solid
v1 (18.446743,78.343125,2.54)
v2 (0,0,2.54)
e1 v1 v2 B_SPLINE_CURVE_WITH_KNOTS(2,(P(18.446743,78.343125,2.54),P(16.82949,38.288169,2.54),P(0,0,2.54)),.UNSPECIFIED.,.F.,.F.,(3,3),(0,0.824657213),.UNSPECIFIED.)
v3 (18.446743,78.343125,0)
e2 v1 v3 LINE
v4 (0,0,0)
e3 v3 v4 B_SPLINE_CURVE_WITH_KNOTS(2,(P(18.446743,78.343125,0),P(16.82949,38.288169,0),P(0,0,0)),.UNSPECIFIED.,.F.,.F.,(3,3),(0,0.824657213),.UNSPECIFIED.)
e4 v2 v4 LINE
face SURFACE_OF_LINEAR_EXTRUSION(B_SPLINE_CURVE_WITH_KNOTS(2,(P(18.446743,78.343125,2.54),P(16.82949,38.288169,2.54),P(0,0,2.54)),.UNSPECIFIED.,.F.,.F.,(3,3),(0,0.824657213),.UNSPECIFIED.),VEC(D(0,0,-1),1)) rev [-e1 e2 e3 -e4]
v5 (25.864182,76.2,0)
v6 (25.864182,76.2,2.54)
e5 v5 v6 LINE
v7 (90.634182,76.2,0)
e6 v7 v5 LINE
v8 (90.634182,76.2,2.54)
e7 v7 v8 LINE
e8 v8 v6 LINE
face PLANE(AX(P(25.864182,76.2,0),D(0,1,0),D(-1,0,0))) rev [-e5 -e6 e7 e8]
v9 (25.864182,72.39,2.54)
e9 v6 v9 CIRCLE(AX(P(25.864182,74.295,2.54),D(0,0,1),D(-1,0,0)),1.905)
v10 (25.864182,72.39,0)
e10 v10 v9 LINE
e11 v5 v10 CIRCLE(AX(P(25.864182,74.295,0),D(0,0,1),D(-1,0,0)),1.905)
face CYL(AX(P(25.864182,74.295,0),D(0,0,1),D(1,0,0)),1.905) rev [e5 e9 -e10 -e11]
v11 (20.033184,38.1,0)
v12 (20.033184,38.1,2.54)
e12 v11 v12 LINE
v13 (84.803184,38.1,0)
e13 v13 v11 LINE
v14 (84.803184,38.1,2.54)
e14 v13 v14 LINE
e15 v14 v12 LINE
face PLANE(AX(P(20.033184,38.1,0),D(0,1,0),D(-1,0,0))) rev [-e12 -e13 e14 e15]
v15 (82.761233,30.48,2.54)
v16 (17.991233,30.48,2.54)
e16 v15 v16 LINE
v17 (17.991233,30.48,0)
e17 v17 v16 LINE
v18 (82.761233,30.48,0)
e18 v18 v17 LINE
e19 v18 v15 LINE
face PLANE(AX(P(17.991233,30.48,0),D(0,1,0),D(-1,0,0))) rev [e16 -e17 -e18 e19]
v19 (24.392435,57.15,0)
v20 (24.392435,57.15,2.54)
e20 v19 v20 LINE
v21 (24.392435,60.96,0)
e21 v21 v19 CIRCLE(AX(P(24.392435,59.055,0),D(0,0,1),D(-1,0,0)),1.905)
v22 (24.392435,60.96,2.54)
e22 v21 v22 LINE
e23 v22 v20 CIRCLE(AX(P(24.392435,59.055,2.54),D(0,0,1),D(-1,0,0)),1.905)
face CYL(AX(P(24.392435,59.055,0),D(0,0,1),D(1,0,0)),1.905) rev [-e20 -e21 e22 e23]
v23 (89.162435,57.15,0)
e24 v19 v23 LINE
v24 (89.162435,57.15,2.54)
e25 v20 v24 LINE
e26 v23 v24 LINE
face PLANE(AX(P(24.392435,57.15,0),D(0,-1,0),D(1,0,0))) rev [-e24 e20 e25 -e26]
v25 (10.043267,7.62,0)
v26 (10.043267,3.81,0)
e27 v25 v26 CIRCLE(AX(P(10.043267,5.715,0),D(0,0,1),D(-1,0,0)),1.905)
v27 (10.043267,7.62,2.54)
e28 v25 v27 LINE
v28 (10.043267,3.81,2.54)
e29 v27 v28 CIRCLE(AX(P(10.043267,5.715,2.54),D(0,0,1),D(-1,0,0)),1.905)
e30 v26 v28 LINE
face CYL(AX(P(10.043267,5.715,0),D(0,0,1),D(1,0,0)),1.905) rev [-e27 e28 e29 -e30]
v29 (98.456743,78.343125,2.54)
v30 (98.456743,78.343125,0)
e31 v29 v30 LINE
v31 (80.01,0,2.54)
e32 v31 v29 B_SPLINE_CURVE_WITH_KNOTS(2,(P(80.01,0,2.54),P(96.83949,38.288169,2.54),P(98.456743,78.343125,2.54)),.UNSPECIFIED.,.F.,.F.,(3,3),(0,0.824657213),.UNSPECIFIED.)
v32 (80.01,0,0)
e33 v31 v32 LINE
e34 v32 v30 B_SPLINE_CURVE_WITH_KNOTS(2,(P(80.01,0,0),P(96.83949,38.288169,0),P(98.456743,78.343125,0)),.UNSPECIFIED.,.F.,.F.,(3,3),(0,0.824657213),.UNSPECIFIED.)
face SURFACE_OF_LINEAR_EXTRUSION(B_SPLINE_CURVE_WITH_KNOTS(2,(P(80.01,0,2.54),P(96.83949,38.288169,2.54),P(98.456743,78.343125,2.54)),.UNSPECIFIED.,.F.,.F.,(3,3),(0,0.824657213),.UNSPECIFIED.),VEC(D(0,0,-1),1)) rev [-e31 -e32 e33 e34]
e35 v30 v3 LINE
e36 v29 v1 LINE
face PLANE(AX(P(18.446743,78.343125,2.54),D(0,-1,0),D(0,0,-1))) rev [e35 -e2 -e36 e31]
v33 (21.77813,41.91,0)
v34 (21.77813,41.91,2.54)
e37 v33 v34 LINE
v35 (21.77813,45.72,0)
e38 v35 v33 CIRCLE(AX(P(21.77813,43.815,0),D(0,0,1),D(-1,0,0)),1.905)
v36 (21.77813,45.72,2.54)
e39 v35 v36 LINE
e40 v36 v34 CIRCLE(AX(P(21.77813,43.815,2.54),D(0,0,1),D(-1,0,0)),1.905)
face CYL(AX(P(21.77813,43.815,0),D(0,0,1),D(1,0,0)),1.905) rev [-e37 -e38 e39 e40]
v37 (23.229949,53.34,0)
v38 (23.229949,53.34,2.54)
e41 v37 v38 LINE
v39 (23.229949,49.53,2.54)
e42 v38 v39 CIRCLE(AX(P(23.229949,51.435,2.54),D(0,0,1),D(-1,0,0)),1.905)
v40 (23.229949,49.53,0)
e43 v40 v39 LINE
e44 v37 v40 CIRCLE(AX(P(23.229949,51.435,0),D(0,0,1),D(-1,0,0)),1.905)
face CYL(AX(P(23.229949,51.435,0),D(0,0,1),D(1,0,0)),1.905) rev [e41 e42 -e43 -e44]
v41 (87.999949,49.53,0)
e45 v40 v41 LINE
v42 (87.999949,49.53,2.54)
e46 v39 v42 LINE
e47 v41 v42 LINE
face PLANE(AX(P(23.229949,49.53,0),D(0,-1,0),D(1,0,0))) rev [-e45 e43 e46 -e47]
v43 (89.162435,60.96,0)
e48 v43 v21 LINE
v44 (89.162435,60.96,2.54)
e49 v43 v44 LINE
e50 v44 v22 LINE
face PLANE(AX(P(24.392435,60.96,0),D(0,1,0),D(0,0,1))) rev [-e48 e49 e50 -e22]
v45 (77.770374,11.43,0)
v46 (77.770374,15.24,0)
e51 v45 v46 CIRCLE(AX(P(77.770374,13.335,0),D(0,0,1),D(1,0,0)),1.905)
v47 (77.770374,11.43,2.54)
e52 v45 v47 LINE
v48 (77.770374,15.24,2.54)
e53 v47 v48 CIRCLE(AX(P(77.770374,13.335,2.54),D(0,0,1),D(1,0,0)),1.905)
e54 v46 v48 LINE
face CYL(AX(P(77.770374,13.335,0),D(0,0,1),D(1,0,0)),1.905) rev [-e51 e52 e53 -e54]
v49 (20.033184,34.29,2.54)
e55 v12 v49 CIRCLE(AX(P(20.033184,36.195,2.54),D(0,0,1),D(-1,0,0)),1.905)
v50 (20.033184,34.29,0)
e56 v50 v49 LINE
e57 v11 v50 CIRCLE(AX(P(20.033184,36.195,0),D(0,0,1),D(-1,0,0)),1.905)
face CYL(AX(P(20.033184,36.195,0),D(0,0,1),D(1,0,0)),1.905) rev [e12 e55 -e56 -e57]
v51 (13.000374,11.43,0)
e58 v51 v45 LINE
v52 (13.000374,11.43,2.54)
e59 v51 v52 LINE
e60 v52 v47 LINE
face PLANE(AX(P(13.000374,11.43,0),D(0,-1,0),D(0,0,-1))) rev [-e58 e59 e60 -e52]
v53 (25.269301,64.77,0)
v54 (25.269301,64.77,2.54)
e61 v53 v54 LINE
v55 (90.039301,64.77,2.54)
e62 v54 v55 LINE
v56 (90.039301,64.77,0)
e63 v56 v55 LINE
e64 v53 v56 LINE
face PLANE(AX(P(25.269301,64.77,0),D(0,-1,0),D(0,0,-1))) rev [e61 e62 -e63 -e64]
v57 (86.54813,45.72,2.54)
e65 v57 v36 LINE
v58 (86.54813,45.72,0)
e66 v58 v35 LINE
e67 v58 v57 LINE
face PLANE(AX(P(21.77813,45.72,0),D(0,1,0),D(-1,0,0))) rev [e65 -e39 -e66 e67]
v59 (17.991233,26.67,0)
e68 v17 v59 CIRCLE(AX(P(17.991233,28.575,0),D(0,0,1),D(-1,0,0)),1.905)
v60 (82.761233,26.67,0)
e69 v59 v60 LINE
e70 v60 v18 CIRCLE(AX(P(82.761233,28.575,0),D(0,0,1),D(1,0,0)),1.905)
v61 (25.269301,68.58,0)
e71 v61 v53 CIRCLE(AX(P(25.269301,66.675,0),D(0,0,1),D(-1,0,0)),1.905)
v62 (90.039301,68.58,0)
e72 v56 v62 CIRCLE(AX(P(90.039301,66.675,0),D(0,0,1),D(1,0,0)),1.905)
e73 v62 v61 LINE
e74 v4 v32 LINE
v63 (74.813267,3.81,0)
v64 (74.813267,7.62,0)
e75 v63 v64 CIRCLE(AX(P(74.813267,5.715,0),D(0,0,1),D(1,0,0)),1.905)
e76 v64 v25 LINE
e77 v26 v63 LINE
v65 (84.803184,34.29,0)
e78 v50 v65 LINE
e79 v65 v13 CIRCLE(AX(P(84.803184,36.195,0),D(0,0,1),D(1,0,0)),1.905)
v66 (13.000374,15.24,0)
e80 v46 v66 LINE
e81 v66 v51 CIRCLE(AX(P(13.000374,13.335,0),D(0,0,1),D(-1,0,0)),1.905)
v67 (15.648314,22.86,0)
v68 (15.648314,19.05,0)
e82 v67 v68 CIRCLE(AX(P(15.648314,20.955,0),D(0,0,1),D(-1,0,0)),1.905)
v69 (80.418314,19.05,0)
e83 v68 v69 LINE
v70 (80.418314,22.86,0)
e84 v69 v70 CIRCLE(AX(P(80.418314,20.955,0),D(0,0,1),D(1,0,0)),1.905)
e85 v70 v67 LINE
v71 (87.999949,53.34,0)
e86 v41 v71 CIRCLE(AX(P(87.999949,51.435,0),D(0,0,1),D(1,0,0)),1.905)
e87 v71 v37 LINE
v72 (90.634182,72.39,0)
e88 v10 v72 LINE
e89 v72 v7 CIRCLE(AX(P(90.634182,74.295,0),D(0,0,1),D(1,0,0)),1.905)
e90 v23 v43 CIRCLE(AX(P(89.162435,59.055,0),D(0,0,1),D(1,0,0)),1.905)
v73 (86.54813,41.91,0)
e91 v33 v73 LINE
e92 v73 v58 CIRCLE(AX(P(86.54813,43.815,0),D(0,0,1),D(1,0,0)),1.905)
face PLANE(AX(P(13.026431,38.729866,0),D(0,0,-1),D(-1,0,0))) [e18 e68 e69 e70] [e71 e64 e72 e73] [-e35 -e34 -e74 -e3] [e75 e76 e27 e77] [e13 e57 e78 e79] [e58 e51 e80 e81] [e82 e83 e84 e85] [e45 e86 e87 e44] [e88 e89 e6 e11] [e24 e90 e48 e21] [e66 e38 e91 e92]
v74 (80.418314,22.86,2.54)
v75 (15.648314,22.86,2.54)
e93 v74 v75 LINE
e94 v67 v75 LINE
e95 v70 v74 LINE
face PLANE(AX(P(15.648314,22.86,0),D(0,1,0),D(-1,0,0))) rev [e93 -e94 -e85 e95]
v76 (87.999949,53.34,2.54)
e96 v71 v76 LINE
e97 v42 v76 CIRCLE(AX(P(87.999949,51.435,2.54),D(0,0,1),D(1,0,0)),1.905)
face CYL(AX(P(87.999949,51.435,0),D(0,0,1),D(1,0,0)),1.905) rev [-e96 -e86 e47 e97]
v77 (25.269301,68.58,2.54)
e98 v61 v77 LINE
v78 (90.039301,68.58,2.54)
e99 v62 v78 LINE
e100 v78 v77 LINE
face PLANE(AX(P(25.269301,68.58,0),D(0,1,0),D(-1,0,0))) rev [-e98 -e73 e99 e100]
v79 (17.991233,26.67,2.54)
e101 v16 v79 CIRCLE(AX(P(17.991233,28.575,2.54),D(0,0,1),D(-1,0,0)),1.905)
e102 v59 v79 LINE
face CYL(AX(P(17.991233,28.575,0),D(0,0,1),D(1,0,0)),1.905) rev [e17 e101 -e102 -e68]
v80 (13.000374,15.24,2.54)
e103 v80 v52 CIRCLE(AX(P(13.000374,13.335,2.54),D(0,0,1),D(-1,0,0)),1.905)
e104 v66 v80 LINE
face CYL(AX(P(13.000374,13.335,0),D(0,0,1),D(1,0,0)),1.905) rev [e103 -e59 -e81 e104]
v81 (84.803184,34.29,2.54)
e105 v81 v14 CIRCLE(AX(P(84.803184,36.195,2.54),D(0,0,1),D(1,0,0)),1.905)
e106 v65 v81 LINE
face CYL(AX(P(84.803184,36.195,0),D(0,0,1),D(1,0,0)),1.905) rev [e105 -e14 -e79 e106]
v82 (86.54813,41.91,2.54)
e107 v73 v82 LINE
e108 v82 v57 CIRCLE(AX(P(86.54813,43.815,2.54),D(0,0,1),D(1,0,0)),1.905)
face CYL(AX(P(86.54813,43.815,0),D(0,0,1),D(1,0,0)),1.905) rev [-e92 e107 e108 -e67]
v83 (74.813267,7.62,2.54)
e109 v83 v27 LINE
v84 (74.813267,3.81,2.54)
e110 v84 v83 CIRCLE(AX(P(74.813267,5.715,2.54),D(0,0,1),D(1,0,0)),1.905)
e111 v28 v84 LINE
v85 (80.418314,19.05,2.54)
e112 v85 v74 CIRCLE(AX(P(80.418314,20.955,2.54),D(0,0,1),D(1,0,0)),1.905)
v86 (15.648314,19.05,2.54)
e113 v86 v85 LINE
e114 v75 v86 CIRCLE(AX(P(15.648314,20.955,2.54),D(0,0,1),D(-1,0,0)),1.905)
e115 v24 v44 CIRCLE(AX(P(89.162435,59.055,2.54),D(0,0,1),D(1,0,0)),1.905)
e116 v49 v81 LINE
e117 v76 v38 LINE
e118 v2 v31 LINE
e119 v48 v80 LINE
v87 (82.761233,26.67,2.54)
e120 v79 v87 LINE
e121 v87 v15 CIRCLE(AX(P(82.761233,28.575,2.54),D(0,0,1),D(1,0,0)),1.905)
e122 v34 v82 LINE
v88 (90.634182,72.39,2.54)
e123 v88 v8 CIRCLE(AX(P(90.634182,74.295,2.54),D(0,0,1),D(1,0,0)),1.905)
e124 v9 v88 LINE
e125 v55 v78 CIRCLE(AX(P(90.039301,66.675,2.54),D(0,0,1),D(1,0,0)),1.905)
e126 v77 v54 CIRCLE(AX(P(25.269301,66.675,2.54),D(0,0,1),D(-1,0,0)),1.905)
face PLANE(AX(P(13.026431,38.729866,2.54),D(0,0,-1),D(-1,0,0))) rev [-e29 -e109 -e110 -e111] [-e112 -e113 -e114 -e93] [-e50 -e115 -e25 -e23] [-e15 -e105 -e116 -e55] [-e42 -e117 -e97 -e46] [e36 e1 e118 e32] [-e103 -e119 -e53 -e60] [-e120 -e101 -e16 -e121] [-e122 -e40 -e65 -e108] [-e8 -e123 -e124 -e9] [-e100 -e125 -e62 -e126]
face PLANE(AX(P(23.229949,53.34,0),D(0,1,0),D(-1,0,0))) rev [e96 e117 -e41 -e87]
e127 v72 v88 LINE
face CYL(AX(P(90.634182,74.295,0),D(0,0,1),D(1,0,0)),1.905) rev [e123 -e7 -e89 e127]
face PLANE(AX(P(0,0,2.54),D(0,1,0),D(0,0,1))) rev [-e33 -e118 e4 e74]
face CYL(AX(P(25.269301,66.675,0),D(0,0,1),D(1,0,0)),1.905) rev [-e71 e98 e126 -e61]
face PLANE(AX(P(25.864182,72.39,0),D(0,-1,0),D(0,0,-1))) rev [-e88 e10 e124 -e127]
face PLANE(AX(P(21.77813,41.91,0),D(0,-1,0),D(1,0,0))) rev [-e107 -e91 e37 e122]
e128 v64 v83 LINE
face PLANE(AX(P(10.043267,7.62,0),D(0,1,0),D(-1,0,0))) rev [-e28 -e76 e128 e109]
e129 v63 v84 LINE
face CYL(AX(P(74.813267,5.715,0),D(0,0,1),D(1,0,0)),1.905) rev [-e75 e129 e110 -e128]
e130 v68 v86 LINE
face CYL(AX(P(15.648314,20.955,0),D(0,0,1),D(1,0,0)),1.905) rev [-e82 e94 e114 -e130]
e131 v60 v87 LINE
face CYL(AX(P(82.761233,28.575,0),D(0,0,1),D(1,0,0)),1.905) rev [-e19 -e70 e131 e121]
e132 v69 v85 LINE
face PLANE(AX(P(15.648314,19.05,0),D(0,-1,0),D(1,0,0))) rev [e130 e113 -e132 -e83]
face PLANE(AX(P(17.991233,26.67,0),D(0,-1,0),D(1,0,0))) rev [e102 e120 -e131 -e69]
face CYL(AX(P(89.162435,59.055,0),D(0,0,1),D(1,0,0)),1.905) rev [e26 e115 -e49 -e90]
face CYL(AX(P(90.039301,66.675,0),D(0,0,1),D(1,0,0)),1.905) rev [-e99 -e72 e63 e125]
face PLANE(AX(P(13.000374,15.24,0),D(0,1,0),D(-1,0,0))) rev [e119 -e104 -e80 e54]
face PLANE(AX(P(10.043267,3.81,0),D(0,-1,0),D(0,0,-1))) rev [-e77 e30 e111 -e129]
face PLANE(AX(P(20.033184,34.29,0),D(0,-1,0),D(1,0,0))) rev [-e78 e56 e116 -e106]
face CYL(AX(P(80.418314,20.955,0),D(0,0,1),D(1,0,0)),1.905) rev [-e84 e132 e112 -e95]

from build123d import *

# Parameters (mm, degrees)
BOSS_EXTRUDE1_DEPTH = 2.54
CUT_EXTRUDE1_DEPTH  = 126.848428748
LPATTERN1_DEPTH     = 2.54


# Read off the part's stored shape, not the designer's step: LPattern1
with BuildPart() as part:
    # Sketch1 → Boss-Extrude1 (new body)
    with BuildSketch(Plane.XY):
        with BuildLine():
            Line((0, 0), (80.01, 0))
            add(Edge.make_bspline(
                [(80.01, 0), (96.839490245, 38.288168981), (98.456742521, 78.343125)],
                knots=[0, 0, 0, 0.824657213, 0.824657213, 0.824657213], degree=2))
            Line((98.456742521, 78.343125), (18.446742521, 78.343125))
            add(Edge.make_bspline(
                [(0, 0), (16.829490245, 38.288168981), (18.446742521, 78.343125)],
                knots=[0, 0, 0, 0.824657213, 0.824657213, 0.824657213], degree=2))
        make_face()
    extrude(amount=BOSS_EXTRUDE1_DEPTH)

    # Sketch2 → Cut-Extrude1 (cut, through all)
    with BuildSketch(Plane.XY.offset(2.54)):
        with BuildLine():
            Line((10.043267201, 7.62), (74.813267201, 7.62))
            ThreePointArc((74.813267201, 7.62), (76.718267201, 5.715), (74.813267201, 3.81))
            Line((74.813267201, 3.81), (10.043267201, 3.81))
            ThreePointArc((10.043267201, 3.81), (8.138267201, 5.715), (10.043267201, 7.62))
        make_face()
    extrude(amount=-CUT_EXTRUDE1_DEPTH, mode=Mode.SUBTRACT)

    # LPattern1 outline → LPattern1 (cut)
    with BuildSketch(Plane.XY):
        with BuildLine():
            Line((77.770374016, 15.24), (13.000374016, 15.24))
            ThreePointArc((13.000374016, 15.24), (11.095374016, 13.335), (13.000374016, 11.43))
            Line((13.000374016, 11.43), (77.770374016, 11.43))
            ThreePointArc((77.770374016, 11.43), (79.675374016, 13.335), (77.770374016, 15.24))
        make_face()
        with BuildLine():
            Line((80.418314493, 22.86), (15.648314493, 22.86))
            ThreePointArc((15.648314493, 22.86), (13.743314493, 20.955), (15.648314493, 19.05))
            Line((15.648314493, 19.05), (80.418314493, 19.05))
            ThreePointArc((80.418314493, 19.05), (82.323314493, 20.955), (80.418314493, 22.86))
        make_face()
        with BuildLine():
            Line((82.761233407, 30.48), (17.991233408, 30.48))
            ThreePointArc((17.991233408, 30.48), (16.086233408, 28.575), (17.991233408, 26.67))
            Line((17.991233408, 26.67), (82.761233407, 26.67))
            ThreePointArc((82.761233407, 26.67), (84.666233407, 28.575), (82.761233407, 30.48))
        make_face()
        with BuildLine():
            Line((84.803183747, 38.1), (20.033183747, 38.1))
            ThreePointArc((20.033183747, 38.1), (18.128183747, 36.195), (20.033183747, 34.29))
            Line((20.033183747, 34.29), (84.803183747, 34.29))
            ThreePointArc((84.803183747, 34.29), (86.708183747, 36.195), (84.803183747, 38.1))
        make_face()
        with BuildLine():
            Line((86.548129526, 45.72), (21.778129526, 45.72))
            ThreePointArc((21.778129526, 45.72), (19.873129526, 43.815), (21.778129526, 41.91))
            Line((21.778129526, 41.91), (86.548129526, 41.91))
            ThreePointArc((86.548129526, 41.91), (88.453129526, 43.815), (86.548129526, 45.72))
        make_face()
        with BuildLine():
            Line((87.999948503, 53.34), (23.229948503, 53.34))
            ThreePointArc((23.229948503, 53.34), (21.324948503, 51.435), (23.229948503, 49.53))
            Line((23.229948503, 49.53), (87.999948503, 49.53))
            ThreePointArc((87.999948503, 49.53), (89.904948503, 51.435), (87.999948503, 53.34))
        make_face()
        with BuildLine():
            Line((89.16243478, 60.96), (24.39243478, 60.96))
            ThreePointArc((24.39243478, 60.96), (22.48743478, 59.055), (24.39243478, 57.15))
            Line((24.39243478, 57.15), (89.16243478, 57.15))
            ThreePointArc((89.16243478, 57.15), (91.06743478, 59.055), (89.16243478, 60.96))
        make_face()
        with BuildLine():
            Line((90.039301311, 68.58), (25.269301311, 68.58))
            ThreePointArc((25.269301311, 68.58), (23.364301311, 66.675), (25.269301311, 64.77))
            Line((25.269301311, 64.77), (90.039301311, 64.77))
            ThreePointArc((90.039301311, 64.77), (91.944301311, 66.675), (90.039301311, 68.58))
        make_face()
        with BuildLine():
            Line((90.634182309, 76.2), (25.864182309, 76.2))
            ThreePointArc((25.864182309, 76.2), (23.959182309, 74.295), (25.864182309, 72.39))
            Line((25.864182309, 72.39), (90.634182309, 72.39))
            ThreePointArc((90.634182309, 72.39), (92.539182309, 74.295), (90.634182309, 76.2))
        make_face()
    extrude(amount=LPATTERN1_DEPTH, mode=Mode.SUBTRACT)


solid = part.part
